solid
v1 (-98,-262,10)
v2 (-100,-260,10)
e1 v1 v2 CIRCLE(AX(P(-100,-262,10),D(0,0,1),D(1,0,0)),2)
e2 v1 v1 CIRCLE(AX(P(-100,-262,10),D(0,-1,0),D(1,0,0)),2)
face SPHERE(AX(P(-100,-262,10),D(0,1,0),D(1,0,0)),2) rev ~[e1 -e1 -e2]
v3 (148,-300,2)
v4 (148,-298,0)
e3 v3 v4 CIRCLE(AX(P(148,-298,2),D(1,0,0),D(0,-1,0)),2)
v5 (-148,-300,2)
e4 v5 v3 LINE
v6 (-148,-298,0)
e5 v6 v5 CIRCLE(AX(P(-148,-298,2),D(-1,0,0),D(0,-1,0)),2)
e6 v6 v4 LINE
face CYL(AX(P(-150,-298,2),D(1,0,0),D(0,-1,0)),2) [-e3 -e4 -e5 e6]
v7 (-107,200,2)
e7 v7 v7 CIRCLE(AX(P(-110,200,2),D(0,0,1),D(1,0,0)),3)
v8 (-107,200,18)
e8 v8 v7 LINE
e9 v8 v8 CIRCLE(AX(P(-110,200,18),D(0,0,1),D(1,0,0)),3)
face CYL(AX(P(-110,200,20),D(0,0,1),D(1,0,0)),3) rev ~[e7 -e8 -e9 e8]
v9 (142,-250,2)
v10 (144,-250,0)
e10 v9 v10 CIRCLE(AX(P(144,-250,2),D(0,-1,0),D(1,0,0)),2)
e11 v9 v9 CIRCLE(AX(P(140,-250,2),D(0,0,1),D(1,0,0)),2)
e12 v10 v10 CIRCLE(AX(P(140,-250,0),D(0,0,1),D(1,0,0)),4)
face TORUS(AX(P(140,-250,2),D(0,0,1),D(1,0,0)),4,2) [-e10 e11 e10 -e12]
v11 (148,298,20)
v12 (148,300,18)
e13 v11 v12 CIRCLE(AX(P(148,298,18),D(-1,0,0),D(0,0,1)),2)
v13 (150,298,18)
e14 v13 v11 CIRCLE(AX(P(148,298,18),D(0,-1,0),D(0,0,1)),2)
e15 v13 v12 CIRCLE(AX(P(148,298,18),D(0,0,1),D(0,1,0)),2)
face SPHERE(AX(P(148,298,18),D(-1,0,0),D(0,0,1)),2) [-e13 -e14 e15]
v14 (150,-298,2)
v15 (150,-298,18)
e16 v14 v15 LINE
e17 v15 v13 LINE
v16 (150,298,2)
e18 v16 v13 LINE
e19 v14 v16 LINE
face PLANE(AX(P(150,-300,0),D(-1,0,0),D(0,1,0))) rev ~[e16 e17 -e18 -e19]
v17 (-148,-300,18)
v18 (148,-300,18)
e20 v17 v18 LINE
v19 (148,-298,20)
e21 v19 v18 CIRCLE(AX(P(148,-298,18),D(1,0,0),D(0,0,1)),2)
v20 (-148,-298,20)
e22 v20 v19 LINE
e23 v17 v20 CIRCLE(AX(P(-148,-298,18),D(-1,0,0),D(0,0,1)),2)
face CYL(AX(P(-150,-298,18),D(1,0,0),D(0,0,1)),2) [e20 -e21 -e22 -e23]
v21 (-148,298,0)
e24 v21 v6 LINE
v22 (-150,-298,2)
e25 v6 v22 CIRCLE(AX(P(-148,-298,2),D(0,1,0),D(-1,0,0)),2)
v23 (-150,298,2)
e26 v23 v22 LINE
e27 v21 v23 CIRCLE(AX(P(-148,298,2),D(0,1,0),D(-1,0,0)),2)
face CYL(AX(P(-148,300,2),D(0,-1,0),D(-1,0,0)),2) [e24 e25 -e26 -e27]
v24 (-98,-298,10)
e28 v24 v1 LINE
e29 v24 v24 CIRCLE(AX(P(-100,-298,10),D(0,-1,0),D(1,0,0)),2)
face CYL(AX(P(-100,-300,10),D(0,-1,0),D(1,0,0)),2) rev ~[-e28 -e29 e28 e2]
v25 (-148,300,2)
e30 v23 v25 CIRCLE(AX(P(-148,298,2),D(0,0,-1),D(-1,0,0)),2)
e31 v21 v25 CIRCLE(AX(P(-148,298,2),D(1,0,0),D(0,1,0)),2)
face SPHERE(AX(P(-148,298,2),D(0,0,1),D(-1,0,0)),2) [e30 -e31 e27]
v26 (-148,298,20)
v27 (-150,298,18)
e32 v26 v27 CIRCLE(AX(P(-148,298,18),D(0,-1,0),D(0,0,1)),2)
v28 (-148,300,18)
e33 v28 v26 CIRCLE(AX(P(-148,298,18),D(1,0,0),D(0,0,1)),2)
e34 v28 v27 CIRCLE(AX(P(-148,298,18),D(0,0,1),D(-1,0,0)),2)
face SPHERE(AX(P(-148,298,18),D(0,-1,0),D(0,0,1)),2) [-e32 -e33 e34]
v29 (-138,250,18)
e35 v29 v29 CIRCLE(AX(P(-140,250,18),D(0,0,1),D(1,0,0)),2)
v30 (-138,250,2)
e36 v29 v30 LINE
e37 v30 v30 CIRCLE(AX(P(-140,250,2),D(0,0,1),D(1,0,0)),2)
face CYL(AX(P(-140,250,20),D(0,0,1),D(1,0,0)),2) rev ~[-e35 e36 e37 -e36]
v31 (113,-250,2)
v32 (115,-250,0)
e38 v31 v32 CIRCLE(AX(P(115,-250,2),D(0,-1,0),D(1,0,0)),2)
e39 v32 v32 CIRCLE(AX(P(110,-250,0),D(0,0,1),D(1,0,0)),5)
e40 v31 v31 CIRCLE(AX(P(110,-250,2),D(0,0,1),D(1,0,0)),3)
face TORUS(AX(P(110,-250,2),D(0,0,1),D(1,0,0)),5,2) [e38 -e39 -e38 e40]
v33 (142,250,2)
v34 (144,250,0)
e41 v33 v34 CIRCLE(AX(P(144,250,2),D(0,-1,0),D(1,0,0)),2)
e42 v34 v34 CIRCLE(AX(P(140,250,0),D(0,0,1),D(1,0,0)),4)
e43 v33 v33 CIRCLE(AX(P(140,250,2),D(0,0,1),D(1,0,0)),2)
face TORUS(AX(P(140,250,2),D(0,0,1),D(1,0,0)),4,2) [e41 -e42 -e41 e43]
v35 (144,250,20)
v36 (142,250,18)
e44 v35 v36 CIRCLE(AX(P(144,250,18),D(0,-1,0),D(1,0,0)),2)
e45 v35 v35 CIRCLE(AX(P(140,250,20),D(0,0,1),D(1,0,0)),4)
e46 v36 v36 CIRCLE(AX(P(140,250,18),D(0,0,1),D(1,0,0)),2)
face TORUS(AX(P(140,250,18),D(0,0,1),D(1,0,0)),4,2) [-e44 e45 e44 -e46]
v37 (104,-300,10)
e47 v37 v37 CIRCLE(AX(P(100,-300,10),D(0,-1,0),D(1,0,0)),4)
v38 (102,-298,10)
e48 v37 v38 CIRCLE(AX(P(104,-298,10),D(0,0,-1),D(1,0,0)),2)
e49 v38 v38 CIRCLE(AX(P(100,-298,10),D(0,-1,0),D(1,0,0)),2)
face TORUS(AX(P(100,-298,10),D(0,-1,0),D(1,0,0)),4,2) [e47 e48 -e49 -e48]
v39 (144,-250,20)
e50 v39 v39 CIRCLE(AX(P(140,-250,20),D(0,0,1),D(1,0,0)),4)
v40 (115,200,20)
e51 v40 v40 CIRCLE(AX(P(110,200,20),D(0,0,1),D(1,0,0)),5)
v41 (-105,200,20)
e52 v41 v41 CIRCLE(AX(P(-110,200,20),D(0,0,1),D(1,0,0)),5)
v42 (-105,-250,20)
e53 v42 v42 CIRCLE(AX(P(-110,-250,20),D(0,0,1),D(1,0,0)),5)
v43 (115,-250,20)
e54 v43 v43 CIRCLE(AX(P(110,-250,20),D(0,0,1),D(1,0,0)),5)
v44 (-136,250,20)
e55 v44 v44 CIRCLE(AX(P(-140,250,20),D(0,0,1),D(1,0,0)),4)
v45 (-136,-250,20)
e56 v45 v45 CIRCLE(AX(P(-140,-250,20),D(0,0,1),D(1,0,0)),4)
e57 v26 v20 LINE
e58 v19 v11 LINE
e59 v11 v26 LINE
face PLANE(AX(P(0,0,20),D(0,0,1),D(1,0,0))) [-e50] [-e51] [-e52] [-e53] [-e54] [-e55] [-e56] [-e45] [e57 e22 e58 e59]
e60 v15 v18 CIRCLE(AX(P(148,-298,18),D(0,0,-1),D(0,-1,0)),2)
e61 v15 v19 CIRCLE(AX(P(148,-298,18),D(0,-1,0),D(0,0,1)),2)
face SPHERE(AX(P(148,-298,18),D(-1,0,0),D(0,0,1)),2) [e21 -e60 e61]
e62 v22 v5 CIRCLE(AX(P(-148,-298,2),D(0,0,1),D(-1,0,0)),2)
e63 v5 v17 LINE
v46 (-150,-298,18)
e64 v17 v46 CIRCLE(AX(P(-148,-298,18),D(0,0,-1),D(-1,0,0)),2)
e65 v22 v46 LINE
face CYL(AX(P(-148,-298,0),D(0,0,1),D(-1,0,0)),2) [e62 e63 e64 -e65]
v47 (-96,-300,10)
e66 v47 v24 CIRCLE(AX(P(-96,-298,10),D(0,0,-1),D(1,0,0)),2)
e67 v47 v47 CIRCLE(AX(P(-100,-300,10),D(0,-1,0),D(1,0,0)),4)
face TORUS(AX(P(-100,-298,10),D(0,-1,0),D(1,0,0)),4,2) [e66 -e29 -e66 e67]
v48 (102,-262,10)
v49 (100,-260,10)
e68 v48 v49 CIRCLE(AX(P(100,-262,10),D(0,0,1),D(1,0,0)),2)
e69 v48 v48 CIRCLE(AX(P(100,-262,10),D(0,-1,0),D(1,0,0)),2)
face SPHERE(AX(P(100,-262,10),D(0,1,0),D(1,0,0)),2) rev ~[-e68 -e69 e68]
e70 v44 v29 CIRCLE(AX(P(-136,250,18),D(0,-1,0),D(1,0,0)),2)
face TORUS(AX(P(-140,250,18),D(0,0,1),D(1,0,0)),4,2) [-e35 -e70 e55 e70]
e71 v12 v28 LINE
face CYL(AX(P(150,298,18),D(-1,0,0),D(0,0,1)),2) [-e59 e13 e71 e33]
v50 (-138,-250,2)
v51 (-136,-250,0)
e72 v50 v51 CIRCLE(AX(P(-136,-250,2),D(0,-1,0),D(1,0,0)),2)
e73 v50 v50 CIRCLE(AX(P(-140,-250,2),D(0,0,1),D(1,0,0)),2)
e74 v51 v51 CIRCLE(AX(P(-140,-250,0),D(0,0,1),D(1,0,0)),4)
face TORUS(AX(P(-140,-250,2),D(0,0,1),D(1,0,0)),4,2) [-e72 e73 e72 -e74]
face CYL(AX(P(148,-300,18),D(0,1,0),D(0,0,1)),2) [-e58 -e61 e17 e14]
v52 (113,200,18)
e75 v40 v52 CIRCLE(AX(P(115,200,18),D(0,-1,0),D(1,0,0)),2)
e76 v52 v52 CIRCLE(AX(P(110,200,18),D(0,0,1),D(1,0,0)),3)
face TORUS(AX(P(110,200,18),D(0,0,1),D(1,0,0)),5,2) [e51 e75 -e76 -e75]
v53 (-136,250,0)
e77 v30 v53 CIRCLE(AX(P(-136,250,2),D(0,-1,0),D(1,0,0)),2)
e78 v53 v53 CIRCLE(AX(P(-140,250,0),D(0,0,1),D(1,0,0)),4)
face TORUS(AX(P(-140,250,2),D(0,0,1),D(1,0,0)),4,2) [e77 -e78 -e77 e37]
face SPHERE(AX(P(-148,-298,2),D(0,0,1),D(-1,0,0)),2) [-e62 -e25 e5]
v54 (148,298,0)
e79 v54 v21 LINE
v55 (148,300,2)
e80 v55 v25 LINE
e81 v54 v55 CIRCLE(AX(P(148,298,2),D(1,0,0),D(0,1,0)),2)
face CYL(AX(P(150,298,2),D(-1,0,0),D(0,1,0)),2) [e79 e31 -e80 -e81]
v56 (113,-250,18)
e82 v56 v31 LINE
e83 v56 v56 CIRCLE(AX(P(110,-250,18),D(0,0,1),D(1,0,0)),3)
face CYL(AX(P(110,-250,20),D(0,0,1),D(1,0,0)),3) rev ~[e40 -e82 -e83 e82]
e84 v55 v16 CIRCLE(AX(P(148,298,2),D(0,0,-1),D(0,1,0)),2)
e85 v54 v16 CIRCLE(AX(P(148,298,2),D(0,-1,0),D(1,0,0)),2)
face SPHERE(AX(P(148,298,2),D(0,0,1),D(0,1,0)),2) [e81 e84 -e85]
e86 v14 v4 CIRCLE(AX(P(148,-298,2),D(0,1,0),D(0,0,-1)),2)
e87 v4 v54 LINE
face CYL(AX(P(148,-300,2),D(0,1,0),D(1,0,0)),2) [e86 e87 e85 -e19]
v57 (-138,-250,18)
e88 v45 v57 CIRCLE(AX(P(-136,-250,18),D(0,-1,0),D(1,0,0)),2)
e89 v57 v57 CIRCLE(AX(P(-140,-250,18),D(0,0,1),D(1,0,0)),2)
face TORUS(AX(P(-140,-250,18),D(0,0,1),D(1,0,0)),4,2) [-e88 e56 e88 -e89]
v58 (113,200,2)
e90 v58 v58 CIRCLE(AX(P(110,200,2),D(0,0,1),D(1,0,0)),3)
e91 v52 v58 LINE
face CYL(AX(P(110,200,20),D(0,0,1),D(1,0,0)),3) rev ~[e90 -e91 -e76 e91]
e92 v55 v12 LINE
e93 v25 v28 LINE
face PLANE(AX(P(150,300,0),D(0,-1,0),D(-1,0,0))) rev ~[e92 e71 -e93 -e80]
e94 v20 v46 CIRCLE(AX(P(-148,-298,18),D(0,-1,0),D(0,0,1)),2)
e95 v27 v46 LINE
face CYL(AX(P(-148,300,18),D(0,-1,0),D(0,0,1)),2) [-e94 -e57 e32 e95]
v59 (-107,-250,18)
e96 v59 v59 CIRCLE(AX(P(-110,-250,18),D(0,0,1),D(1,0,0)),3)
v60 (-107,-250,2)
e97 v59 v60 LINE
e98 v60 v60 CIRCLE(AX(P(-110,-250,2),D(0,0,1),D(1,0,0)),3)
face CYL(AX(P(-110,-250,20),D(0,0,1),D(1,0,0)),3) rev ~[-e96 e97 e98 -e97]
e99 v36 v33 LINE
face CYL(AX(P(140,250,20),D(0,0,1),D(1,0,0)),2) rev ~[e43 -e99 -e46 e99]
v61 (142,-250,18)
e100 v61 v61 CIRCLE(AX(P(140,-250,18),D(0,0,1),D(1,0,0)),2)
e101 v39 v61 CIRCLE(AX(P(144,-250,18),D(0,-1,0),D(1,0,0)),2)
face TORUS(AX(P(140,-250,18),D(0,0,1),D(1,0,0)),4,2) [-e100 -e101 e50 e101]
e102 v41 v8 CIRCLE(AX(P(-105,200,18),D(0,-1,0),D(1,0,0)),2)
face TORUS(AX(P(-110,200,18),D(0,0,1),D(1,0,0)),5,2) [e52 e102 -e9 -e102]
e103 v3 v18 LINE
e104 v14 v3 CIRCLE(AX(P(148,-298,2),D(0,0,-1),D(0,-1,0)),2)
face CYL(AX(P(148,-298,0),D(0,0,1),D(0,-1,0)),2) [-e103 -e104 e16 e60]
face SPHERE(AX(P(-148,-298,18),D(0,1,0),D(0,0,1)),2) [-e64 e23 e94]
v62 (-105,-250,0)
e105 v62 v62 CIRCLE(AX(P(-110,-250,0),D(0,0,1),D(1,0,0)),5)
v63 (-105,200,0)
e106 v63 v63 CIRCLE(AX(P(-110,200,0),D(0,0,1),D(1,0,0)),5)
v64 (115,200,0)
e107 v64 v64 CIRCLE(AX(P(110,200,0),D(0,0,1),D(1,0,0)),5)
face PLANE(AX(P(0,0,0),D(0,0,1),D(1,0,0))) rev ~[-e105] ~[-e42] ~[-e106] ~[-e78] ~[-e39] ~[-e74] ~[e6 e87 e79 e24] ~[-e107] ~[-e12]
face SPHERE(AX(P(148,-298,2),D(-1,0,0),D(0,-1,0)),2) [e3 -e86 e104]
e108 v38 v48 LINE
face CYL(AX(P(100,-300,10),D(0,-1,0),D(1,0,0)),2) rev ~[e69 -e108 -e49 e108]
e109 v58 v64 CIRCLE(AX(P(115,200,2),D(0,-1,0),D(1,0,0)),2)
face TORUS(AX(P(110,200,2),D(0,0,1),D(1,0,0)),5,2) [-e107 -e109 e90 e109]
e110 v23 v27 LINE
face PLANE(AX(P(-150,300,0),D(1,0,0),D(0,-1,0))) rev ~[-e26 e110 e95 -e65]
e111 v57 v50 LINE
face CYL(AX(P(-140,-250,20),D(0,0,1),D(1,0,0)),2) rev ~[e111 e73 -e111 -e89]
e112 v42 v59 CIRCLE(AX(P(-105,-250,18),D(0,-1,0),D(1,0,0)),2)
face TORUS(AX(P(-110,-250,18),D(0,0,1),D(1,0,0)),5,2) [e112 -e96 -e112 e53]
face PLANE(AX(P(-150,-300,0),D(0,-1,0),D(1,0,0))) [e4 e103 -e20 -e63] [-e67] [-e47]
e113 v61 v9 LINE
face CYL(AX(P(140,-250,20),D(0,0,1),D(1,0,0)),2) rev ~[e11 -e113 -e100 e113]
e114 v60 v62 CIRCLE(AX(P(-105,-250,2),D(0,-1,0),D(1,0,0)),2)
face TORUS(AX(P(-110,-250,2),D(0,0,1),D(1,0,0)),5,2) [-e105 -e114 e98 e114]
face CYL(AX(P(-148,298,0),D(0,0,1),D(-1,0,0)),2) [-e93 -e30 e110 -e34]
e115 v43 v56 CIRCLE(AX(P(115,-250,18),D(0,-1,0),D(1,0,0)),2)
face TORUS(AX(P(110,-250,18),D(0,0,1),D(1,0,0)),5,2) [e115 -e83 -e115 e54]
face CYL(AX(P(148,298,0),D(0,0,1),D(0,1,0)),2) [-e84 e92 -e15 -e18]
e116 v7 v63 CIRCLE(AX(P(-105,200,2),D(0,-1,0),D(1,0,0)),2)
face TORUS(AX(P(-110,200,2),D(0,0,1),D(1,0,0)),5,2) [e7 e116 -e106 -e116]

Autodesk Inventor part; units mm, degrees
ref_plane "YZ Plane" through (0, 0, 0) normal (1, 0, 0) x (0, 1, 0)
ref_plane "XZ Plane" through (0, 0, 0) normal (0, 1, 0) x (-1, 0, 0)
ref_plane "XY Plane" through (0, 0, 0) normal (0, 0, 1) x (1, 0, 0)
sketch "草图1" plane through (0, 0, 0) normal (1, 0, 0) x (0, 1, 0)
  point P0 (0, 0)
sketch "草图2" plane through (0, 0, 0) normal (0, 0, 1) x (1, 0, 0)
  line L0 (-150, -300) -> (150, -300)
  line L1 (150, -300) -> (150, 300)
  line L2 (150, 300) -> (-150, 300)
  line L3 (-150, 300) -> (-150, -300)
  point P0 (0, 0)
  dimension "d0" = 300
  dimension "d1" = 600
extrude "拉伸1" add sketch "草图2" along normal blind 20
sketch "草图3" plane through (0, 0, 20) normal (0, 0, 1) x (1, 0, 0)
  circle A0 centre (-140, 250) radius 2
  point P0 (0, 0)
  dimension "d4" = 4
extrude "拉伸2" cut sketch "草图3" against normal through all
sketch "草图4" plane through (0, 0, 20) normal (0, 0, 1) x (1, 0, 0)
  circle A0 centre (-110, 250) radius 2
  point P0 (0, 0)
  dimension "d7" = 4
extrude "拉伸3" cut sketch "草图4" against normal up to next
sketch "草图5" plane through (0, 0, 20) normal (0, 0, 1) x (1, 0, 0)
  circle A0 centre (140, 250) radius 2
  point P0 (0, 0)
  dimension "d10" = 4
extrude "拉伸4" cut sketch "草图5" against normal up to next
sketch "草图6" plane through (0, 0, 20) normal (0, 0, 1) x (1, 0, 0)
  circle A0 centre (110, 250) radius 2
  point P0 (0, 0)
  dimension "d13" = 4
extrude "拉伸5" cut sketch "草图6" against normal through all
sketch "草图7" plane through (0, 0, 20) normal (0, 0, 1) x (1, 0, 0)
  circle A0 centre (140, -250) radius 2
  point P0 (0, 0)
  dimension "d16" = 4
extrude "拉伸6" cut sketch "草图7" against normal through all
sketch "草图8" plane through (0, 0, 20) normal (0, 0, 1) x (1, 0, 0)
  circle A0 centre (110, -250) radius 2
  point P0 (0, 0)
  dimension "d19" = 4
extrude "拉伸7" cut sketch "草图8" against normal through all
sketch "草图9" plane through (0, 0, 20) normal (0, 0, 1) x (1, 0, 0)
  circle A0 centre (-140, -250) radius 2
  point P0 (0, 0)
  dimension "d22" = 4
extrude "拉伸8" cut sketch "草图9" against normal through all
sketch "草图10" plane through (0, 0, 20) normal (0, 0, 1) x (1, 0, 0)
  circle A0 centre (-110, -250) radius 2
  point P0 (0, 0)
  dimension "d25" = 4
extrude "拉伸9" cut sketch "草图10" against normal through all
sketch "草图11" plane through (-150, -300, 0) normal (0, -1, 0) x (1, 0, 0)
  circle A0 centre (25, 10) radius 2
  point P0 (150, 0)
  dimension "d28" = 4
extrude "拉伸10" cut sketch "草图11" against normal blind 20
sketch "草图12" plane through (-150, -300, 0) normal (0, -1, 0) x (1, 0, 0)
  circle A0 centre (275, 10) radius 2
  point P0 (150, 0)
  dimension "d31" = 4
extrude "拉伸11" cut sketch "草图12" against normal blind 20
sketch "草图13" plane through (-150, -300, 0) normal (0, -1, 0) x (1, 0, 0)
  circle A0 centre (275, 10) radius 2 projected
  circle A1 centre (275, 10) radius 2
  point P0 (150, 0)
  dimension "d34" = 4
extrude "拉伸12" cut sketch "草图13" against normal blind 40
sketch "草图14" plane through (-150, -300, 0) normal (0, -1, 0) x (1, 0, 0)
  circle A0 centre (25, 10) radius 2 projected
  circle A1 centre (25, 10) radius 2
  point P0 (150, 0)
  dimension "d37" = 4
extrude "拉伸13" cut sketch "草图14" against normal blind 40
sketch "草图15" plane through (-150, -300, 0) normal (0, -1, 0) x (1, 0, 0)
  circle A0 centre (25, 10) radius 2 projected
  circle A1 centre (25, 10) radius 2
  point P0 (150, 0)
  dimension "d40" = 4
extrude "拉伸14" add sketch "草图15" against normal blind 600
sketch "草图16" plane through (-150, -300, 0) normal (0, -1, 0) x (1, 0, 0)
  circle A0 centre (275, 10) radius 2 projected
  circle A1 centre (275, 10) radius 2
  point P0 (150, 0)
  dimension "d43" = 4
extrude "拉伸15" add sketch "草图16" against normal blind 600
sketch "草图17" plane through (-150, -300, 0) normal (0, -1, 0) x (1, 0, 0)
  circle A0 centre (50, 10) radius 2
  point P0 (150, 0)
  dimension "d46" = 4
extrude "拉伸16" cut sketch "草图17" against normal blind 40
sketch "草图18" plane through (-150, -300, 0) normal (0, -1, 0) x (1, 0, 0)
  circle A0 centre (250, 10) radius 2
  point P0 (150, 0)
  dimension "d49" = 4
extrude "拉伸17" cut sketch "草图18" against normal blind 40
sketch "草图19" plane through (0, 0, 20) normal (0, 0, 1) x (1, 0, 0)
  circle A0 centre (110, 250) radius 3
  point P0 (0, 0)
  dimension "d52" = 6
extrude "拉伸18" cut sketch "草图19" against normal through all
sketch "草图20" plane through (0, 0, 20) normal (0, 0, 1) x (1, 0, 0)
  circle A0 centre (-110, 250) radius 2 projected
  circle A1 centre (-110, 250) radius 3
  point P0 (0, 0)
  dimension "d55" = 6
extrude "拉伸19" cut sketch "草图20" against normal through all
sketch "草图21" plane through (0, 0, 20) normal (0, 0, 1) x (1, 0, 0)
  point P0 (0, 0)
sketch "草图22" plane through (0, 0, 20) normal (0, 0, 1) x (1, 0, 0)
  circle A0 centre (-110, -250) radius 2 projected
  circle A1 centre (-110, -250) radius 3
  point P0 (0, 0)
  dimension "d58" = 6
extrude "拉伸20" cut sketch "草图22" against normal through all
sketch "草图23" plane through (0, 0, 20) normal (0, 0, 1) x (1, 0, 0)
  circle A0 centre (110, -250) radius 2 projected
  circle A1 centre (110, -250) radius 3
  point P0 (0, 0)
  dimension "d61" = 6
extrude "拉伸21" cut sketch "草图23" against normal through all
sketch "草图24" plane through (0, 0, 20) normal (0, 0, 1) x (1, 0, 0)
  circle A0 centre (-109.8054, 249.5578) radius 2
  point P0 (0, 0)
  dimension "d64" = 4
extrude "拉伸22" add sketch "草图24" against normal blind 20
sketch "草图25" plane through (-109.8054, 249.5578, 20) normal (0, 0, 1) x (1, 0, 0)
  point P0 (109.8054, -249.5578)
sketch "草图26" plane through (0, 0, 20) normal (0, 0, 1) x (1, 0, 0)
  circle A0 centre (-110, 250) radius 2
  point P0 (0, 0)
  dimension "d67" = 4
extrude "拉伸23" cut sketch "草图26" against normal blind 20
sketch "草图27" plane through (0, 0, 20) normal (0, 0, 1) x (1, 0, 0)
  circle A0 centre (-110, 250) radius 2
  point P0 (0, 0)
  dimension "d70" = 4
extrude "拉伸24" add sketch "草图27" against normal blind 20
sketch "草图28" plane through (0, 0, 20) normal (0, 0, 1) x (1, 0, 0)
  arc A0 (-111.7199, 248.9793) -> (-108.0855, 250.5785) centre (-109.8054, 249.5578) ccw projected
  circle A1 centre (-111.7199, 248.9793) radius 12.6213
  point P0 (0, 0)
extrude "拉伸25" add sketch "草图28" against normal blind 20
sketch "草图29" plane through (0, 0, 20) normal (0, 0, 1) x (1, 0, 0)
  circle A0 centre (110, 250) radius 3 projected
  circle A1 centre (110, 250) radius 2
  point P0 (0, 0)
  dimension "d75" = 4
extrude "拉伸26" add sketch "草图29" against normal blind 20
sketch "草图30" plane through (0, 0, 20) normal (0, 0, 1) x (1, 0, 0)
  circle A0 centre (88.039, 258.3731) radius 35.0217
  point P0 (0, 0)
extrude "拉伸27" add sketch "草图30" against normal blind 20
sketch "草图31" plane through (0, 0, 20) normal (0, 0, 1) x (1, 0, 0)
  circle A0 centre (110, 200) radius 2
  point P0 (0, 0)
  dimension "d80" = 4
extrude "拉伸28" cut sketch "草图31" against normal through all
sketch "草图32" plane through (0, 0, 20) normal (0, 0, 1) x (1, 0, 0)
  circle A0 centre (-110, 200) radius 2
  point P0 (0, 0)
  dimension "d83" = 4
extrude "拉伸29" cut sketch "草图32" against normal through all
sketch "草图33" plane through (0, 0, 20) normal (0, 0, 1) x (1, 0, 0)
  circle A0 centre (-110, 200) radius 2 projected
  circle A1 centre (-110, 200) radius 3
  point P0 (0, 0)
  dimension "d86" = 6
extrude "拉伸30" cut sketch "草图33" against normal through all
sketch "草图34" plane through (0, 0, 20) normal (0, 0, 1) x (1, 0, 0)
  circle A0 centre (110, 200) radius 2 projected
  circle A1 centre (110, 200) radius 3
  point P0 (0, 0)
  dimension "d89" = 6
extrude "拉伸31" cut sketch "草图34" against normal through all
fillet "圆角1" radius 2 2 edges at (-102, -260, 10) (98, -260, 10)
fillet "圆角1" radius 2 30 edges at (-150, 0, 20) (0, 300, 20) (0, -300, 20) (150, 0, 20) (-142, -250, 20) (-113, -250, 20) (107, -250, 20) (138, -250, 20) (-113, 200, 20) (-142, 250, 20) (107, 200, 20) (138, 250, 20) (-150, 300, 10) (-150, -300, 10) (-150, 0, 0) (150, 300, 10) (0, 300, 0) (0, -300, 0) (150, -300, 10) (-102, -300, 10) (98, -300, 10) (150, 0, 0) (-142, -250, 0) (-113, -250, 0) (107, -250, 0) (138, -250, 0) (-113, 200, 0) (-142, 250, 0) (107, 200, 0) (138, 250, 0)
properties part number "垃圾桶正版"
